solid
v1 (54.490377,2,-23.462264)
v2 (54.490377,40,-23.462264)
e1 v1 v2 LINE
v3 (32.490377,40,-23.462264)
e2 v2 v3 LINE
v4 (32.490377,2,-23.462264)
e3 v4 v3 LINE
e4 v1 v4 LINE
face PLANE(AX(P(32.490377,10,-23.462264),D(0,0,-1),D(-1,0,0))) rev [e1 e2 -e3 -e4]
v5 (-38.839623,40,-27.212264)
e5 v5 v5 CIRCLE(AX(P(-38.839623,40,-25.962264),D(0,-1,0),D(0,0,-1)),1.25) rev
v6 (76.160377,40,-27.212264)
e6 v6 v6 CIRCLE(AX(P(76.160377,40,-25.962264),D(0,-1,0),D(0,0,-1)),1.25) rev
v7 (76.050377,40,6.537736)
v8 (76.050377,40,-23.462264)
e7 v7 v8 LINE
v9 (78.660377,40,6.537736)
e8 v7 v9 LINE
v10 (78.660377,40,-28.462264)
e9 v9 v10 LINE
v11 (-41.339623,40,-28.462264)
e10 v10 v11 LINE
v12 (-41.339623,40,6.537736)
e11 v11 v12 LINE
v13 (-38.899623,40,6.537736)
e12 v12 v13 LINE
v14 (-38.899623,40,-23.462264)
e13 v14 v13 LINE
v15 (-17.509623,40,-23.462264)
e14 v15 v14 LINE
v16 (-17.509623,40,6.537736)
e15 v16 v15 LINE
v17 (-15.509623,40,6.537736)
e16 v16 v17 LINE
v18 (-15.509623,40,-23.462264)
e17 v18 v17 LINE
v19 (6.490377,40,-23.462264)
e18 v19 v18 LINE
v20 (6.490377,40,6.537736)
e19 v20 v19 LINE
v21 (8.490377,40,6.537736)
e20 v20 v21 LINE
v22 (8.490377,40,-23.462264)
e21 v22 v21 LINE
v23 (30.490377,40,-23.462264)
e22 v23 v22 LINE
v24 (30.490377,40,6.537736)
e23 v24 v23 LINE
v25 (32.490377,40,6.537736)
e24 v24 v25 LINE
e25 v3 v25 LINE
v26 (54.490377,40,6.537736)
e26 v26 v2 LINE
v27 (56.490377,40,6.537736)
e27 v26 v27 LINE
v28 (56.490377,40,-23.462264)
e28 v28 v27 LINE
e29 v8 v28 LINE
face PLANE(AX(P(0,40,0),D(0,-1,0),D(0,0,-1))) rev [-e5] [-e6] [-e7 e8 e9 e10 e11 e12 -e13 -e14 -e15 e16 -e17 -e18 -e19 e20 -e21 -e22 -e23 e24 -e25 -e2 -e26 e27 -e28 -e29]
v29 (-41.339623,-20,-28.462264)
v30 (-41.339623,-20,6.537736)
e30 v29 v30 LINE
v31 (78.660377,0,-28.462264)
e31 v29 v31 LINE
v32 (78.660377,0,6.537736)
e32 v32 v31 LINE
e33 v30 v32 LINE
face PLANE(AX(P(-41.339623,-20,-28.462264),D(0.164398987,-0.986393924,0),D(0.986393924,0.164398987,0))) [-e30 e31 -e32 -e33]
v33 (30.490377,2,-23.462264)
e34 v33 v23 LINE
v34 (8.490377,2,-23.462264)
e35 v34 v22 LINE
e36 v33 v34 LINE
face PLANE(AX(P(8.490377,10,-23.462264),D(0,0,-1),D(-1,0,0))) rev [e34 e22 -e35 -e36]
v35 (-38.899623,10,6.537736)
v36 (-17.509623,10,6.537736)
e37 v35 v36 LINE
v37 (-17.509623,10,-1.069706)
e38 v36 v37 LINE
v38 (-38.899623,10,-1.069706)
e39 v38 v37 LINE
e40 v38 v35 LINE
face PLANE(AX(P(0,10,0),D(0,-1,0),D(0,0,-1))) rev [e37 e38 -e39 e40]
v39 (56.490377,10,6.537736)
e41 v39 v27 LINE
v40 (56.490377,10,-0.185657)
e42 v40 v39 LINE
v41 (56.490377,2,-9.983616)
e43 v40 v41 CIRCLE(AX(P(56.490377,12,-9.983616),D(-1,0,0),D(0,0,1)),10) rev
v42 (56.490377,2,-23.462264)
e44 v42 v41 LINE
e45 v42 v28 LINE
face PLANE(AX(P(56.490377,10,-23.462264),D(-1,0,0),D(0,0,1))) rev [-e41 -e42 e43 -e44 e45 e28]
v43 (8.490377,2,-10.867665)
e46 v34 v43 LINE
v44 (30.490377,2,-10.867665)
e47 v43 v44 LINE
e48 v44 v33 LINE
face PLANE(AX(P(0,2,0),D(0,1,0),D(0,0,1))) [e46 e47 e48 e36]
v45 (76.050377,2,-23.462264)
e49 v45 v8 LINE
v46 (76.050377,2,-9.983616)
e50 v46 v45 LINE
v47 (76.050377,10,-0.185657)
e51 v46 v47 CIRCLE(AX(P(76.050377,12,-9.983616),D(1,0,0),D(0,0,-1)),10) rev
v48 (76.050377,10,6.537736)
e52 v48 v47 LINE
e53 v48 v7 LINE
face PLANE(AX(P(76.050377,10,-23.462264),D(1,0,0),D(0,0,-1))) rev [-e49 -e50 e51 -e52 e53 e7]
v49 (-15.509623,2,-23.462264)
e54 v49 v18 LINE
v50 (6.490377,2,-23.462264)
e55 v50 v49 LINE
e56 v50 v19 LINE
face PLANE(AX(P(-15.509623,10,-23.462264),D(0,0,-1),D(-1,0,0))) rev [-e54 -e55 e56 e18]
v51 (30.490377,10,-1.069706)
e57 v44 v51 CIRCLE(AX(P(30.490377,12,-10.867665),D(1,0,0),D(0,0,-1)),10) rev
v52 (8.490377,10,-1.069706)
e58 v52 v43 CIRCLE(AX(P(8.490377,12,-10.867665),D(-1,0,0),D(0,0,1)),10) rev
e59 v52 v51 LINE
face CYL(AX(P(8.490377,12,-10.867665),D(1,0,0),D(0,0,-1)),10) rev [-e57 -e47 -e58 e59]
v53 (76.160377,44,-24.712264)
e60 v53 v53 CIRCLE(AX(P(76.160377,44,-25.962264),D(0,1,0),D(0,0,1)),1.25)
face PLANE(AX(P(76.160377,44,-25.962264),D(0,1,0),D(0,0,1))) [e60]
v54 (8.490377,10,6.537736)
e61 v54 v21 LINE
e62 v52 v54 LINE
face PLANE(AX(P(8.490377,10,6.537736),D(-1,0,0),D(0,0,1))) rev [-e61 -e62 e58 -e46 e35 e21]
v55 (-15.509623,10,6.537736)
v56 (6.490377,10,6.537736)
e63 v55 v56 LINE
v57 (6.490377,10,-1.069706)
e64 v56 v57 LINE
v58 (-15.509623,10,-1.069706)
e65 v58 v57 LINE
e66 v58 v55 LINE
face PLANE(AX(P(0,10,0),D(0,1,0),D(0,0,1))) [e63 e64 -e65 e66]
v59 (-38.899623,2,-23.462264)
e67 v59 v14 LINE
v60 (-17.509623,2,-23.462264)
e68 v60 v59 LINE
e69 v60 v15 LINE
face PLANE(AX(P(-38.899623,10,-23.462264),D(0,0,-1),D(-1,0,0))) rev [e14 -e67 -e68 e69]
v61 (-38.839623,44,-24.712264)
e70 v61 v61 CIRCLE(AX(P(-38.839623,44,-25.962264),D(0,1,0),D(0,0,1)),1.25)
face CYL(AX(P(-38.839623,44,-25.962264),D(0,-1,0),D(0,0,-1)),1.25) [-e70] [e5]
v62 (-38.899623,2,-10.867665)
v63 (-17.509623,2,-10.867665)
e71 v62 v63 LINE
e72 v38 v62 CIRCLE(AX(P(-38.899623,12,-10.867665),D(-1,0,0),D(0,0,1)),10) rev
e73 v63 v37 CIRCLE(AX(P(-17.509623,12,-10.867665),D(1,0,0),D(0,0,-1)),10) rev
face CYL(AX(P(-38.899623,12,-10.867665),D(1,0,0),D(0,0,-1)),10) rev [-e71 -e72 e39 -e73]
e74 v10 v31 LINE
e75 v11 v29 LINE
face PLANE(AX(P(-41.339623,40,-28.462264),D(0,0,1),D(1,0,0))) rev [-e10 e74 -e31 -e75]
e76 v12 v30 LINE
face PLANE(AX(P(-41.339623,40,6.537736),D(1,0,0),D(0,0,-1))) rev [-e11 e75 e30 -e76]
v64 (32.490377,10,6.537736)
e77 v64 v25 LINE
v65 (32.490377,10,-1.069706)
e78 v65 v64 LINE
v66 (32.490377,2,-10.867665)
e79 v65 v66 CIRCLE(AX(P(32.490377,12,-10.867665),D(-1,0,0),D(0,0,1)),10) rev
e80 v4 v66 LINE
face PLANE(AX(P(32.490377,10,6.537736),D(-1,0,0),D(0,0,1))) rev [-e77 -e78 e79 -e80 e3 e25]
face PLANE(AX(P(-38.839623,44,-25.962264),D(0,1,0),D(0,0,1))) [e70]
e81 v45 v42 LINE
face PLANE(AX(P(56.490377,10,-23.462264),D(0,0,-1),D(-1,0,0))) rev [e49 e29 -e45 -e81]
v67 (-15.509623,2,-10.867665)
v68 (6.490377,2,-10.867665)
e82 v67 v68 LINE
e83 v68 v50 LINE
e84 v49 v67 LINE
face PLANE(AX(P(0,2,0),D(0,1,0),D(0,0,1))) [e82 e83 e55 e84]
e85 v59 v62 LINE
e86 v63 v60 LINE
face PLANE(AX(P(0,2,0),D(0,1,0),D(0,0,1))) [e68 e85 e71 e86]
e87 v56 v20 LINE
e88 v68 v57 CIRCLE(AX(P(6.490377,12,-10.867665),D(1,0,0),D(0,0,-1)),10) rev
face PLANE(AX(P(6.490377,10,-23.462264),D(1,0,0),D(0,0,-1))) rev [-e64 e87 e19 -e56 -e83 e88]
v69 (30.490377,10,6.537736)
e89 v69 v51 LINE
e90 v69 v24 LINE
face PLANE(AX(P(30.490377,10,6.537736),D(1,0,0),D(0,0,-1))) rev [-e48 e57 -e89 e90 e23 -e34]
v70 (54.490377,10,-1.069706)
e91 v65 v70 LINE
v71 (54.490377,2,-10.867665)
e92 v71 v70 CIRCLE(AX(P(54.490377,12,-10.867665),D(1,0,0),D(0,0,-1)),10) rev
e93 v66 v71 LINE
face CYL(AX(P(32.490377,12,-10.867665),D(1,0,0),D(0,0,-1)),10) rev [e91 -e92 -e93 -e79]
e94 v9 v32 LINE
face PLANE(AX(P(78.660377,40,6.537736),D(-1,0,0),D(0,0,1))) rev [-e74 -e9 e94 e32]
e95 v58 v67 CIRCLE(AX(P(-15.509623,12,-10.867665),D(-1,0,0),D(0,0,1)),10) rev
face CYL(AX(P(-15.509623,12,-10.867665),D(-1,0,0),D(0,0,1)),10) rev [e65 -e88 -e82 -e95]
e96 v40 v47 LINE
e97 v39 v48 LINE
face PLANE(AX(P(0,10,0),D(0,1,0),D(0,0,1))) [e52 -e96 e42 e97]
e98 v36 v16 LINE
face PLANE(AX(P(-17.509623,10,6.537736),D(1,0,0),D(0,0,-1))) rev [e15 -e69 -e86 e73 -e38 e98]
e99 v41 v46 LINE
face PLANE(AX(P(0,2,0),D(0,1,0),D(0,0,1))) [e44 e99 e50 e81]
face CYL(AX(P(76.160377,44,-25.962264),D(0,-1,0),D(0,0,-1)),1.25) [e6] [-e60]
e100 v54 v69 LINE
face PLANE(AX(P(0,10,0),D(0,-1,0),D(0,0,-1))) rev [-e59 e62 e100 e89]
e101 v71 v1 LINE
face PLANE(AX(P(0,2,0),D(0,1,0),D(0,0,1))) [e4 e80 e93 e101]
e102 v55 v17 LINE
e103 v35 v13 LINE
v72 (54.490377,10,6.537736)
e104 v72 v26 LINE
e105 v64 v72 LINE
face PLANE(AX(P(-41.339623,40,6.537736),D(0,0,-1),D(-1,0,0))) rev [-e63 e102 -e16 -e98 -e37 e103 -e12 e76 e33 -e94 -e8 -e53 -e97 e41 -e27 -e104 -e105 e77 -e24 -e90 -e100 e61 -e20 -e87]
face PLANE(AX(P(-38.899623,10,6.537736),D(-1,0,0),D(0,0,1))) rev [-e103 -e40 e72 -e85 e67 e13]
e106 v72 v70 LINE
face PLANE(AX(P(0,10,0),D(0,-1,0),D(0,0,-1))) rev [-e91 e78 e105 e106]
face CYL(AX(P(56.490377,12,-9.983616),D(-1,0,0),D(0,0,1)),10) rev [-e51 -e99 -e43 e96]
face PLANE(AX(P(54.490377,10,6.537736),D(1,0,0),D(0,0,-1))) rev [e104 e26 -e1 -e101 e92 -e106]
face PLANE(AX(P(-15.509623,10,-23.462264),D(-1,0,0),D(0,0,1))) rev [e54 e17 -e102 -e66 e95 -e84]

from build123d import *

# Parameters (mm, degrees)
SKETCH1_W           = 120
SKETCH1_H           = 35
BOSS_EXTRUDE1_DEPTH = 40
SKETCH2_W           = 21.39
SKETCH2_H           = 30
SKETCH2_W_2         = 22
SKETCH2_W_3         = 19.56
CUT_EXTRUDE1_DEPTH  = 30
SKETCH3_W           = 21.39
SKETCH3_H           = 22.392557851
SKETCH3_W_2         = 22
SKETCH3_W_3         = 19.56
SKETCH3_H_2         = 23.276606707
CUT_EXTRUDE2_DEPTH  = 8
FILLET1_R           = 10
SKETCH4_R           = 1.25
BOSS_EXTRUDE2_DEPTH = 4
BOSS_EXTRUDE3_DEPTH = 35


with BuildPart() as part:
    # Sketch1 → Boss-Extrude1 (new body)
    with BuildSketch(Plane(origin=(0, 0, 0), x_dir=(1, 0, 0), z_dir=(0, 1, 0))):
        with Locations((18.660377358, 10.962264151)):
            Rectangle(SKETCH1_W, SKETCH1_H)
    extrude(amount=BOSS_EXTRUDE1_DEPTH)

    # Sketch2 → Cut-Extrude1 (cut)
    with BuildSketch(Plane(origin=(0, 40, 0), x_dir=(1, 0, 0), z_dir=(0, 1, 0))):
        with Locations((-28.204622642, 8.462264151)):
            Rectangle(SKETCH2_W, SKETCH2_H)
        with Locations((-4.509622642, 8.462264151)):
            Rectangle(SKETCH2_W_2, SKETCH2_H)
        with Locations((19.490377358, 8.462264151)):
            Rectangle(SKETCH2_W_2, SKETCH2_H)
        with Locations((43.490377358, 8.462264151)):
            Rectangle(SKETCH2_W_2, SKETCH2_H)
        with Locations((66.270377358, 8.462264151)):
            Rectangle(SKETCH2_W_3, SKETCH2_H)
    extrude(amount=-CUT_EXTRUDE1_DEPTH, mode=Mode.SUBTRACT)

    # Sketch3 → Cut-Extrude2 (cut)
    with BuildSketch(Plane(origin=(0, 10, 0), x_dir=(1, 0, 0), z_dir=(0, 1, 0))):
        with Locations((-28.204622642, 12.265985226)):
            Rectangle(SKETCH3_W, SKETCH3_H)
        with Locations((-4.509622642, 12.265985226)):
            Rectangle(SKETCH3_W_2, SKETCH3_H)
        with Locations((19.490377358, 12.265985226)):
            Rectangle(SKETCH3_W_2, SKETCH3_H)
        with Locations((43.490377358, 12.265985226)):
            Rectangle(SKETCH3_W_2, SKETCH3_H)
        with Locations((66.270377358, 11.823960798)):
            Rectangle(SKETCH3_W_3, SKETCH3_H_2)
    extrude(amount=-CUT_EXTRUDE2_DEPTH, mode=Mode.SUBTRACT)

    # Fillet1
    # the kernel refuses this fillet: 10 mm, written as the material it adds along each edge
    with BuildSketch(Plane(origin=(76.050377358, 2, -0.185657444), x_dir=(0, 0, -1), z_dir=(-1, 0, 0))) as fillet1_piece_1:
        with BuildLine():
            CenterArc((9.797958971, -10), FILLET1_R, 90, 78.463040967)
            Line((0, -8), (-0.195959179, -7.96))
            ThreePointArc((-0.195959179, -7.96), (-0.2, -4), (-0.2, 0))
            Line((-0.2, 0), (0, 0.2))
            Line((0, 0.2), (9.797958971, 0.2))
            Line((9.797958971, 0.2), (9.797958971, 0))
        make_face()
    extrude(amount=44.054897428)
    with BuildSketch(Plane(origin=(54.490377358, 2, -1.0697063), x_dir=(0, 1, 0), z_dir=(-1, 0, 0))) as fillet1_piece_2:
        with BuildLine():
            CenterArc((10, 9.797958971), FILLET1_R, 180, 78.463040967)
            Line((0, 9.797958971), (-0.2, 9.797958971))
            Line((-0.2, 9.797958971), (-0.2, 0))
            Line((-0.2, 0), (0, -0.2))
            ThreePointArc((0, -0.2), (4, -0.2), (7.96, -0.195959179))
            Line((7.96, -0.195959179), (8, 0))
        make_face()
    extrude(amount=46.494897428)
    with BuildSketch(Plane(origin=(54.985274786, 2, -1.0697063), x_dir=(0, 1, 0), z_dir=(-1, 0, 0))) as fillet1_piece_3:
        with BuildLine():
            CenterArc((10, 9.797958971), FILLET1_R, 180, 78.463040967)
            Line((0, 9.797958971), (-0.2, 9.797958971))
            Line((-0.2, 9.797958971), (-0.2, 0))
            Line((-0.2, 0), (0, -0.2))
            ThreePointArc((0, -0.2), (4, -0.2), (7.96, -0.195959179))
            Line((7.96, -0.195959179), (8, 0))
        make_face()
    extrude(amount=70.989794856)
    with BuildSketch(Plane(origin=(6.985274786, 2, -1.0697063), x_dir=(0, 1, 0), z_dir=(-1, 0, 0))) as fillet1_piece_4:
        with BuildLine():
            CenterArc((10, 9.797958971), FILLET1_R, 180, 78.463040967)
            Line((0, 9.797958971), (-0.2, 9.797958971))
            Line((-0.2, 9.797958971), (-0.2, 0))
            Line((-0.2, 0), (0, -0.2))
            ThreePointArc((0, -0.2), (4, -0.2), (7.96, -0.195959179))
            Line((7.96, -0.195959179), (8, 0))
        make_face()
    extrude(amount=45.884897428)
    with BuildSketch(Plane(origin=(30.985274786, 2, -1.0697063), x_dir=(0, 0, -1), z_dir=(-1, 0, 0))) as fillet1_piece_5:
        with BuildLine():
            CenterArc((9.797958971, -10), FILLET1_R, 90, 78.463040967)
            Line((0, -8), (-0.195959179, -7.96))
            ThreePointArc((-0.195959179, -7.96), (-0.2, -4), (-0.2, 0))
            Line((-0.2, 0), (0, 0.2))
            Line((0, 0.2), (9.797958971, 0.2))
            Line((9.797958971, 0.2), (9.797958971, 0))
        make_face()
    extrude(amount=70.989794856)

    # Sketch4 → Boss-Extrude2 (add)
    with BuildSketch(Plane(origin=(0, 40, 0), x_dir=(1, 0, 0), z_dir=(0, 1, 0))):
        with Locations(Location((-38.839622642, 25.962264151, 0), (0, 0, 90))):
            Circle(SKETCH4_R)
        with Locations(Location((76.160377358, 25.962264151, 0), (0, 0, 90))):
            Circle(SKETCH4_R)
    extrude(amount=BOSS_EXTRUDE2_DEPTH)

    # Sketch5 → Boss-Extrude3 (add)
    with BuildSketch(Plane.XY.offset(6.537735849)):
        Polygon((-41.339622642, 0), (-41.339622642, -20), (78.660377358, 0), align=None)
    extrude(amount=-BOSS_EXTRUDE3_DEPTH)


solid = part.part
